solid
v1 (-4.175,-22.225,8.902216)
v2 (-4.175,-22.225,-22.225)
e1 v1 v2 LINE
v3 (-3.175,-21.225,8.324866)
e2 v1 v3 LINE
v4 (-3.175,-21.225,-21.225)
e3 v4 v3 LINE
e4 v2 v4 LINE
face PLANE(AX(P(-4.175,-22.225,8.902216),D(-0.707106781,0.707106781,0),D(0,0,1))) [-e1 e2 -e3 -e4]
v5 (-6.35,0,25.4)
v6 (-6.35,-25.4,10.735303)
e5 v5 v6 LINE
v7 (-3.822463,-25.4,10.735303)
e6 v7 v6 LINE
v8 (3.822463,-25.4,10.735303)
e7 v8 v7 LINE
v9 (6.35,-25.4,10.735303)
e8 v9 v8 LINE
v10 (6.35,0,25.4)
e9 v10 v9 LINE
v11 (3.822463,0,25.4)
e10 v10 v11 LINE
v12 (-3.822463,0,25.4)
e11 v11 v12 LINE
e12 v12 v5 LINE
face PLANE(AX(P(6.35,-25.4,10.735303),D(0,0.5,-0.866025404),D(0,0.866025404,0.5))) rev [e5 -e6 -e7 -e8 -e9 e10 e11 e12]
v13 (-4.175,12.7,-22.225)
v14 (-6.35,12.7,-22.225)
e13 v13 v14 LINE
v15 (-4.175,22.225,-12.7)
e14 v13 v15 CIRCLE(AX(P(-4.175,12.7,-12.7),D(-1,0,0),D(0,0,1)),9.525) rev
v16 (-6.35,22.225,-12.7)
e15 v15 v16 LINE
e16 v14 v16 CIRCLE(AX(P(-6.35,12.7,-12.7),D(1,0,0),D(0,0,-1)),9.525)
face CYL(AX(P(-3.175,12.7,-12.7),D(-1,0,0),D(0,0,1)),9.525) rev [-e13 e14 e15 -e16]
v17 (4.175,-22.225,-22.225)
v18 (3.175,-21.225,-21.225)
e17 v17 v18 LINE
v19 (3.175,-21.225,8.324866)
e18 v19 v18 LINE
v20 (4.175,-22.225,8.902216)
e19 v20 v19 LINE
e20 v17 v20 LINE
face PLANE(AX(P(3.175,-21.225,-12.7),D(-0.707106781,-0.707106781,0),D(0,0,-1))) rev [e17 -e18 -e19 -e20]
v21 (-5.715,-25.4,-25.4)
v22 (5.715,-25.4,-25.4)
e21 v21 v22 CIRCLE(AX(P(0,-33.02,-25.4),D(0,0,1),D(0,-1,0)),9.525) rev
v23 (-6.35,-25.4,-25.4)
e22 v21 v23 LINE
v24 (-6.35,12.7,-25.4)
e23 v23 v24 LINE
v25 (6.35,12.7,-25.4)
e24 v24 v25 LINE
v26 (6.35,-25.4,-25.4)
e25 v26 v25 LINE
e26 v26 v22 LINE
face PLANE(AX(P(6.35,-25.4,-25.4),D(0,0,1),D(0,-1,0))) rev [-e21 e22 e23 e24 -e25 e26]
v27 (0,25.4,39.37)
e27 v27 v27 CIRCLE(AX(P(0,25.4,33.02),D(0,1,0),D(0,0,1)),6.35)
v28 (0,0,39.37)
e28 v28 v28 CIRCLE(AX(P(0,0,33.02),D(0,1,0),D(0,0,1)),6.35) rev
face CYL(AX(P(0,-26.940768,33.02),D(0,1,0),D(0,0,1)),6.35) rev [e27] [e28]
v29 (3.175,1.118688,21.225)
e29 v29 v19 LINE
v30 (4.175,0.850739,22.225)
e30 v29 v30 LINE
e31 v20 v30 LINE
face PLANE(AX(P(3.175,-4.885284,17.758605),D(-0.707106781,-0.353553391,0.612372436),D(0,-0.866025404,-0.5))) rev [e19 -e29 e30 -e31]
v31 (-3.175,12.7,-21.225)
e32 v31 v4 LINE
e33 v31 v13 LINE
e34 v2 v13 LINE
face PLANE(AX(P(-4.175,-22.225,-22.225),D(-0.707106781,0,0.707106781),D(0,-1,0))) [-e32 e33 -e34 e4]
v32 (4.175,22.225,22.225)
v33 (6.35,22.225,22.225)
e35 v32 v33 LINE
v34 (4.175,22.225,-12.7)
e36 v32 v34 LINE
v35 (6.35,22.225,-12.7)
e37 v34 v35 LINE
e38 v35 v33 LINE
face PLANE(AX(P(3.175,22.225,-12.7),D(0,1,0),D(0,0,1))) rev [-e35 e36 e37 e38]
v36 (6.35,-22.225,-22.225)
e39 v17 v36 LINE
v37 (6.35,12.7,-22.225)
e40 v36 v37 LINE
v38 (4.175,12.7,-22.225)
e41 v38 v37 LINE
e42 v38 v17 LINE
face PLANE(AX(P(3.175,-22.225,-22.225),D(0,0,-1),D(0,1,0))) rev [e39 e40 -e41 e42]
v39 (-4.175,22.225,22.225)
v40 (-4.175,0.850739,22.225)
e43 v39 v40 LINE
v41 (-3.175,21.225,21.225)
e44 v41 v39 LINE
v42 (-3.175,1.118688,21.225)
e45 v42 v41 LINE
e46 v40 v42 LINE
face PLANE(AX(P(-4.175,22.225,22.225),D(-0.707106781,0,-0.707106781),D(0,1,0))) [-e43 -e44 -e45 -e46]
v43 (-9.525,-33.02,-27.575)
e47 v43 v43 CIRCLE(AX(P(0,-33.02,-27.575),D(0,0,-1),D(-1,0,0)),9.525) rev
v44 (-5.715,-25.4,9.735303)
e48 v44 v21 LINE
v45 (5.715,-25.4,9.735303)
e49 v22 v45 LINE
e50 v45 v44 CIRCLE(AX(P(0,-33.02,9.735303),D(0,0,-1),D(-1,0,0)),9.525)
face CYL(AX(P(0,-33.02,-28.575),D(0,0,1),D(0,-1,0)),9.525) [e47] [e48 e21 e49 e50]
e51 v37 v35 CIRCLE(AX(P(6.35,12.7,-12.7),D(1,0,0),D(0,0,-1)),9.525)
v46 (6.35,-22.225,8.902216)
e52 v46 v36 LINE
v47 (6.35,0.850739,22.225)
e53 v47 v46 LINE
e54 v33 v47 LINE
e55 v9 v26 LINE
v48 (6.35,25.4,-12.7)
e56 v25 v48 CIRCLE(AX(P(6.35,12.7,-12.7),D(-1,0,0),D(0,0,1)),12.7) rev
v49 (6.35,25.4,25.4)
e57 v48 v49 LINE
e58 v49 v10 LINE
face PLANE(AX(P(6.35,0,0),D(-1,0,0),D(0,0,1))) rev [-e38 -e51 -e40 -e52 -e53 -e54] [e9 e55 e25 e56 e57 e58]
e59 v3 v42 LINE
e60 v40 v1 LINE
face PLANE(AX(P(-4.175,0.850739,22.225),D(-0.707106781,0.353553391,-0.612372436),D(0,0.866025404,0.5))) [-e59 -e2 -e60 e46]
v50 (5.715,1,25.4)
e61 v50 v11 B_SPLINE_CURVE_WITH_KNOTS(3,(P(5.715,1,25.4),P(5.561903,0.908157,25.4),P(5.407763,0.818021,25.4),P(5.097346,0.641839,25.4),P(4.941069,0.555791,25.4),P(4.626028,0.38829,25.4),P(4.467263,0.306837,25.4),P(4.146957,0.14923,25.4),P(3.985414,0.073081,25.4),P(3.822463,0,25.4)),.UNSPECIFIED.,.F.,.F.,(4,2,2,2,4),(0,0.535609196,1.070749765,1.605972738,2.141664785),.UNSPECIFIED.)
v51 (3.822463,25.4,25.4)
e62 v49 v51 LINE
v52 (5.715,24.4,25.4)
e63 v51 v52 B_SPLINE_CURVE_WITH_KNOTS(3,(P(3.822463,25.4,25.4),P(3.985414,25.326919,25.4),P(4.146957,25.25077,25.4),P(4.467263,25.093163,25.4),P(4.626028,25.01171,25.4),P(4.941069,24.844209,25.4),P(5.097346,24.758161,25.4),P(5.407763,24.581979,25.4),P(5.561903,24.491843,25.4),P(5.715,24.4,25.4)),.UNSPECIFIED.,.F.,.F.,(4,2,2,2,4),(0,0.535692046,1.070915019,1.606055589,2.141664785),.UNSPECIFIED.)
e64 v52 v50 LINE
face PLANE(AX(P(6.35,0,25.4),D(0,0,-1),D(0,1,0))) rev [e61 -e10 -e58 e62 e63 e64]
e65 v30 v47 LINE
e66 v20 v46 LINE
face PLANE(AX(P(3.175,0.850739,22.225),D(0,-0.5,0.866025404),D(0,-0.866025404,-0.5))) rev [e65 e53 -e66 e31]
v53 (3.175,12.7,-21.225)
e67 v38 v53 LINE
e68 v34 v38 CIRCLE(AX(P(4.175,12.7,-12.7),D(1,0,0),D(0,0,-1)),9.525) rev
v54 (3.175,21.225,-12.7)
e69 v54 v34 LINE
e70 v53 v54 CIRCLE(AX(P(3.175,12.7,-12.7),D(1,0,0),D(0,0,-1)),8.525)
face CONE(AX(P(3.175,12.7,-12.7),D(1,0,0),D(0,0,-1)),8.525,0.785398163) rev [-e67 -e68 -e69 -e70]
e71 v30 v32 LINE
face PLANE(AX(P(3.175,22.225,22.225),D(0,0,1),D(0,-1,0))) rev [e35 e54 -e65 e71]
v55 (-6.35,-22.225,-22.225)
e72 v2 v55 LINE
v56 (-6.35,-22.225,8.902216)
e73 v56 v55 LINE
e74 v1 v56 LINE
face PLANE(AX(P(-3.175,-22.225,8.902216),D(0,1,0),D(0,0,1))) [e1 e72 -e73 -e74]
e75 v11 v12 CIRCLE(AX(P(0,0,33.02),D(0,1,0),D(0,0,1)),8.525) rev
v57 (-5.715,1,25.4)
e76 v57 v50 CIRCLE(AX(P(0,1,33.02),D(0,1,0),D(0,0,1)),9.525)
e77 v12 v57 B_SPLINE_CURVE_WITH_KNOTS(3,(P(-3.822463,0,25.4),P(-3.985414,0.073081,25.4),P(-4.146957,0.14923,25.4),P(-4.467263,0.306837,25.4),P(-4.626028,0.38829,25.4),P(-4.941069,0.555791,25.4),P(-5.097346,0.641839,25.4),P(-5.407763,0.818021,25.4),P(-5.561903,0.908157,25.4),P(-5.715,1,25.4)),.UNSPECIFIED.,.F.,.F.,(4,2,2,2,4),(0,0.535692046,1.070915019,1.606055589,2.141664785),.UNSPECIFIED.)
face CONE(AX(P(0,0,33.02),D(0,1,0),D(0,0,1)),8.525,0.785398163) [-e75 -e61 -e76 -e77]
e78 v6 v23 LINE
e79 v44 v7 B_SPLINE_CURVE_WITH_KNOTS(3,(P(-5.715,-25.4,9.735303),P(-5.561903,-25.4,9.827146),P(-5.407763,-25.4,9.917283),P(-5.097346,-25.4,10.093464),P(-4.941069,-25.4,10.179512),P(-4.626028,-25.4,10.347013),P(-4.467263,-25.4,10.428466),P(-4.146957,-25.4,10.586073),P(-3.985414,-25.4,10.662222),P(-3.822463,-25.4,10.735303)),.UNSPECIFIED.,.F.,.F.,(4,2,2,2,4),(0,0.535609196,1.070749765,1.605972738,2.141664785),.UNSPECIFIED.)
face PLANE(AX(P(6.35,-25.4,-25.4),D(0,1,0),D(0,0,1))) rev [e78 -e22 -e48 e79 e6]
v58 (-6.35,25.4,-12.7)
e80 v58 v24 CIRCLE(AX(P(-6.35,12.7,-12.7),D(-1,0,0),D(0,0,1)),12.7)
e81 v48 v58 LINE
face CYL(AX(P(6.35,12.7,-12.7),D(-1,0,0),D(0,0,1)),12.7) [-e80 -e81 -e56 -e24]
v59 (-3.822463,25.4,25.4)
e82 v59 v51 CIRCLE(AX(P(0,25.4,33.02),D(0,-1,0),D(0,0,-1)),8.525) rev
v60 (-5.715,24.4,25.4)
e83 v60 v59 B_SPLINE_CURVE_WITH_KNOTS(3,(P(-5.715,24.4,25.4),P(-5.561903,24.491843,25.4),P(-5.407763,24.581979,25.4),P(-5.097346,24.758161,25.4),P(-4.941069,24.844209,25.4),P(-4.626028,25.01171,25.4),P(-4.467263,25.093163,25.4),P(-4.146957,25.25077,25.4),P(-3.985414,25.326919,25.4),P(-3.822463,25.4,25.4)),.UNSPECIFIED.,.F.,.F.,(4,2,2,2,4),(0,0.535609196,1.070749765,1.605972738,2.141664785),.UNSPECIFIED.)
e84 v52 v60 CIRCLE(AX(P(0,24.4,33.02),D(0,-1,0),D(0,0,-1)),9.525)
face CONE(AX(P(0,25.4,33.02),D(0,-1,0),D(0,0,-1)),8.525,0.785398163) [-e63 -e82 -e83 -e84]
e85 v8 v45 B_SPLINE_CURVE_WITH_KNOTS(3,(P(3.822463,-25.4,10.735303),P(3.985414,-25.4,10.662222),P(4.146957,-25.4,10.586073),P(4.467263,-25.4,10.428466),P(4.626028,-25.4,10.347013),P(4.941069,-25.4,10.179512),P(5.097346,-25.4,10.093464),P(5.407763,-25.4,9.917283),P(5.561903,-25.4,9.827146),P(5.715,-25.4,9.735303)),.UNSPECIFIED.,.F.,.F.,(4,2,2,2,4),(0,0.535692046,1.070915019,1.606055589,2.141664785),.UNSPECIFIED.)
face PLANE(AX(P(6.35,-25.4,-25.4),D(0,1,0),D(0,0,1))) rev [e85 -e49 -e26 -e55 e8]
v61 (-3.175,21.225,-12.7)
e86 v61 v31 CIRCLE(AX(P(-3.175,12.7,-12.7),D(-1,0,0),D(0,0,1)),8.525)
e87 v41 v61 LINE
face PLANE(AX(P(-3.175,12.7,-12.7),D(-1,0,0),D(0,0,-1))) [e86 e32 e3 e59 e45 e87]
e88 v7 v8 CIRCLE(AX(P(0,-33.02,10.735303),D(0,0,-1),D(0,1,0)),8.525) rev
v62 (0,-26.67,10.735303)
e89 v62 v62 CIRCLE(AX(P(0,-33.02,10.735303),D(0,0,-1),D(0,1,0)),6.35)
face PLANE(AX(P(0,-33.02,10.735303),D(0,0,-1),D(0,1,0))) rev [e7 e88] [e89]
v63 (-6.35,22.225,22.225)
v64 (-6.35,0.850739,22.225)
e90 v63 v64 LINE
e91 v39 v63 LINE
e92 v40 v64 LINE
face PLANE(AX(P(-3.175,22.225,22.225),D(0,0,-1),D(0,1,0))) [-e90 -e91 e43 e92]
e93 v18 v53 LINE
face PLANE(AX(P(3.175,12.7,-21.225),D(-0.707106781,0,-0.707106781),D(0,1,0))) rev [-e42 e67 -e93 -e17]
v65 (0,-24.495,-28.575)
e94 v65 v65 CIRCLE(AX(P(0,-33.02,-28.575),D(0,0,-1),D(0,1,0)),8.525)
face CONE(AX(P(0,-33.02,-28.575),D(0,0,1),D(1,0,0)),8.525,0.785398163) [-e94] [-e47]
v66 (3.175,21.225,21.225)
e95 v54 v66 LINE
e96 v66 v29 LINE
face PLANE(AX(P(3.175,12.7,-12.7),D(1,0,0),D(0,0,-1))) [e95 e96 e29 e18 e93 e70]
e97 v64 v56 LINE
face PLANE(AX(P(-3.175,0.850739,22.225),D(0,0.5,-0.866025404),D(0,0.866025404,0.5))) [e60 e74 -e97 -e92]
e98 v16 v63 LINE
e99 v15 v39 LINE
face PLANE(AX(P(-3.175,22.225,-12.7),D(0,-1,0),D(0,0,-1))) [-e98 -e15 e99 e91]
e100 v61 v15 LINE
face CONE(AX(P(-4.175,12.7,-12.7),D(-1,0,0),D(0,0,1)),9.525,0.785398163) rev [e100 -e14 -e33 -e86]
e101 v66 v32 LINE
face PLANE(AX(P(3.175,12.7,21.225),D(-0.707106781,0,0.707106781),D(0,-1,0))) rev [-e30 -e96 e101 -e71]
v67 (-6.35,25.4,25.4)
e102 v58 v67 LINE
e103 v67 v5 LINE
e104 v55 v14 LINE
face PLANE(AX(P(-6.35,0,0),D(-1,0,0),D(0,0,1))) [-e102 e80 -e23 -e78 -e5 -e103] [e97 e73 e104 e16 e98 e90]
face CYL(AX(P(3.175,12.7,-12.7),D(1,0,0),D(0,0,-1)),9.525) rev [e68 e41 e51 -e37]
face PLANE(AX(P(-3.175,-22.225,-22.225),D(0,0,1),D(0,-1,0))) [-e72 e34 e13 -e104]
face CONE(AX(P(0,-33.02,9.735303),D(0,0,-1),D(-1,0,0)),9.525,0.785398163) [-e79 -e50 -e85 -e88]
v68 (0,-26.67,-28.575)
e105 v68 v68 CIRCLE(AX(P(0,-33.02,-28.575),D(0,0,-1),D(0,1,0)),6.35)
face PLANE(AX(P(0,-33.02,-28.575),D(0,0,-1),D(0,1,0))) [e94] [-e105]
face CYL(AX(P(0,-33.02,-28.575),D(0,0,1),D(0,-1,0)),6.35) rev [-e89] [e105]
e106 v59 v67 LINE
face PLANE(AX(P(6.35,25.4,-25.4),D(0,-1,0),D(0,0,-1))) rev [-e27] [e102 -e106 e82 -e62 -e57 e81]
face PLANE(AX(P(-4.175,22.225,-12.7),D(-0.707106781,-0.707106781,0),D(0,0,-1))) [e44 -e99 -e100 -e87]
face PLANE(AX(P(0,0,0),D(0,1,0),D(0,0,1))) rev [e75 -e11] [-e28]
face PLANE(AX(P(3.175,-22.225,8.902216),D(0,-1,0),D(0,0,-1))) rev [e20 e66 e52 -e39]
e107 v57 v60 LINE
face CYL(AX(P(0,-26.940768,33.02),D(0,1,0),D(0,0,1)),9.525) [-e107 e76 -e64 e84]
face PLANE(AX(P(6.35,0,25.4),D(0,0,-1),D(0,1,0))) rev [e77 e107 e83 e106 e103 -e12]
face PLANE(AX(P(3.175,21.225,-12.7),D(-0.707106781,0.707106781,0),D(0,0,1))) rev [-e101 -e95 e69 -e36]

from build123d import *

# Parameters (mm, degrees)
BOSS_EXTRUDE1_DEPTH      = 6.35
FILLET1_R                = 12.7
CUT_EXTRUDE2_DEPTH       = 3.175
BOSS_EXTRUDE2_DEPTH      = 3.175
BOSS_EXTRUDE2_DEPTH_BACK = 36.135303
SKETCH4_R                = 9.525
SKETCH4_R_2              = 6.35
SKETCH5_R                = 9.525
SKETCH5_R_2              = 6.35
BOSS_EXTRUDE3_DEPTH      = 25.4
CHAMFER2_SIZE            = 1
CHAMFER4_SIZE            = 1


with BuildPart() as part:
    # Sketch1 → Boss-Extrude1 (new, symmetric)
    with BuildSketch(Plane.YZ):
        Polygon((-25.4, 10.735303163), (0, 25.4), (25.4, 25.4), (25.4, -25.4), (-25.4, -25.4), align=None)
    extrude(amount=BOSS_EXTRUDE1_DEPTH, both=True)

    # Fillet1
    fillet1_edges = [part.edges().sort_by_distance(p)[0] for p in [
        (0, 25.4, -25.4),
    ]]
    fillet(fillet1_edges, radius=FILLET1_R)

    # Sketch3 → Cut-Extrude2 (cut)
    with BuildSketch(Plane.YZ.offset(6.35)):
        with BuildLine():
            Line((-22.225, -22.225), (12.7, -22.225))
            ThreePointArc((12.7, -22.225), (19.435192091, -19.435192091), (22.225, -12.7))
            Line((22.225, -12.7), (22.225, 22.225))
            Line((22.225, 22.225), (0.850738686, 22.225))
            Line((0.850738686, 22.225), (-22.225, 8.902216058))
            Line((-22.225, 8.902216058), (-22.225, -22.225))
        make_face()
    cut_extrude2 = extrude(amount=-CUT_EXTRUDE2_DEPTH, mode=Mode.SUBTRACT)

    # Mirror1: Cut-Extrude2 across plane
    add(cut_extrude2.mirror(Plane(origin=(0, 0, 0), x_dir=(0, 0, 1), z_dir=(1, 0, 0))), mode=Mode.SUBTRACT)

    # Sketch4 → Boss-Extrude2 (add, two sides: drawn at the far end of the back side and taken through both)
    with BuildSketch(Plane(origin=(0, 0, -25.4), x_dir=(1, 0, 0), z_dir=(0, 0, -1)).offset(-BOSS_EXTRUDE2_DEPTH_BACK)):
        with Locations(Location((0, 33.02, 0), (0, 0, 233.130102354))):
            Circle(SKETCH4_R)
        with Locations(Location((0, 33.02, 0), (0, 0, 270))):
            Circle(SKETCH4_R_2, mode=Mode.SUBTRACT)
    extrude(amount=BOSS_EXTRUDE2_DEPTH + BOSS_EXTRUDE2_DEPTH_BACK)

    # Sketch5 → Boss-Extrude3 (add)
    with BuildSketch(Plane(origin=(0, 25.4, 0), x_dir=(-1, 0, 0), z_dir=(0, 1, 0))):
        with Locations((0, 33.02)):
            Circle(SKETCH5_R)
        with Locations(Location((0, 33.02, 0), (0, 0, 90))):
            Circle(SKETCH5_R_2, mode=Mode.SUBTRACT)
    extrude(amount=-BOSS_EXTRUDE3_DEPTH)

    # Chamfer2
    # the kernel refuses this chamfer: 1 mm, written as the material it takes off along each edge
    with BuildSketch(Plane(origin=(0, -33.02, 10.735303), x_dir=(0.3638595085405839, 0.931453841070294, 0), z_dir=(-0.931453841070294, 0.3638595085405839, 0))) as chamfer2_piece_1_section:
        Polygon((9.525, CHAMFER2_SIZE), (9.525 - CHAMFER2_SIZE, 0), (9.525, 0), align=None)
    chamfer2_piece_1 = revolve(axis=Axis((0, -33.02, 10.735303), (0, 0, -1)), revolution_arc=317.325176487, mode=Mode.PRIVATE)
    chamfer2_piece_1 = split(chamfer2_piece_1, bisect_by=Plane(origin=(5.777045626, -25.4, 10.24862198), z_dir=(0, -1, 0)), keep=Keep.TOP, mode=Mode.PRIVATE)
    add(chamfer2_piece_1, mode=Mode.SUBTRACT)
    with BuildSketch(Plane(origin=(0, -33.02, -28.575), x_dir=(-0.6000000000021781, 0.7999999999983665, 0), z_dir=(-0.7999999999983665, -0.6000000000021781, 0))) as chamfer2_piece_2:
        Polygon((9.525, -CHAMFER2_SIZE), (9.525 - CHAMFER2_SIZE, 0), (9.525, 0), align=None)
    revolve(axis=Axis((0, -33.02, -28.575), (0, 0, -1)), mode=Mode.SUBTRACT)
    with BuildSketch(Plane(origin=(0, 25.4, 33.02), x_dir=(-0.3638595085405501, 0, -0.9314538410703074), z_dir=(0.9314538410703074, 0, -0.3638595085405501))) as chamfer2_piece_3_section:
        Polygon((9.525, -CHAMFER2_SIZE), (9.525 - CHAMFER2_SIZE, 0), (9.525, 0), align=None)
    chamfer2_piece_3 = revolve(axis=Axis((0, 25.4, 33.02), (0, 1, 0)), revolution_arc=317.325176487, mode=Mode.PRIVATE)
    chamfer2_piece_3 = split(chamfer2_piece_3, bisect_by=Plane(origin=(0, 24.920234358, 25.4), z_dir=(0, 0, 1)), keep=Keep.TOP, mode=Mode.PRIVATE)
    add(chamfer2_piece_3, mode=Mode.SUBTRACT)
    with BuildSketch(Plane(origin=(0, 0, 33.02), x_dir=(-0.3638595085405531, 0, -0.9314538410703063), z_dir=(0.9314538410703063, 0, -0.3638595085405531))) as chamfer2_piece_4_section:
        Polygon((9.525, CHAMFER2_SIZE), (9.525 - CHAMFER2_SIZE, 0), (9.525, 0), align=None)
    chamfer2_piece_4 = revolve(axis=Axis((0, 0, 33.02), (0, 1, 0)), revolution_arc=317.325176487, mode=Mode.PRIVATE)
    chamfer2_piece_4 = split(chamfer2_piece_4, bisect_by=Plane(origin=(-5.452412952, 0.490850729, 25.4), z_dir=(0, 0, 1)), keep=Keep.TOP, mode=Mode.PRIVATE)
    add(chamfer2_piece_4, mode=Mode.SUBTRACT)

    # Chamfer4
    chamfer4_edges = [part.edges().sort_by_distance(p)[0] for p in [
        (3.175, -22.225, -6.661391971),
        (3.175, -10.687130657, 15.563608029),
        (3.175, 11.537869343, 22.225),
        (3.175, 22.225, 4.7625),
        (3.175, 19.435192091, -19.435192091),
        (3.175, -4.7625, -22.225),
        (-3.175, -22.225, -6.661391971),
        (-3.175, -4.7625, -22.225),
        (-3.175, 19.435192091, -19.435192091),
        (-3.175, 22.225, 4.7625),
        (-3.175, 11.537869343, 22.225),
        (-3.175, -10.687130657, 15.563608029),
    ]]
    chamfer(chamfer4_edges, length=CHAMFER4_SIZE)


solid = part.part
